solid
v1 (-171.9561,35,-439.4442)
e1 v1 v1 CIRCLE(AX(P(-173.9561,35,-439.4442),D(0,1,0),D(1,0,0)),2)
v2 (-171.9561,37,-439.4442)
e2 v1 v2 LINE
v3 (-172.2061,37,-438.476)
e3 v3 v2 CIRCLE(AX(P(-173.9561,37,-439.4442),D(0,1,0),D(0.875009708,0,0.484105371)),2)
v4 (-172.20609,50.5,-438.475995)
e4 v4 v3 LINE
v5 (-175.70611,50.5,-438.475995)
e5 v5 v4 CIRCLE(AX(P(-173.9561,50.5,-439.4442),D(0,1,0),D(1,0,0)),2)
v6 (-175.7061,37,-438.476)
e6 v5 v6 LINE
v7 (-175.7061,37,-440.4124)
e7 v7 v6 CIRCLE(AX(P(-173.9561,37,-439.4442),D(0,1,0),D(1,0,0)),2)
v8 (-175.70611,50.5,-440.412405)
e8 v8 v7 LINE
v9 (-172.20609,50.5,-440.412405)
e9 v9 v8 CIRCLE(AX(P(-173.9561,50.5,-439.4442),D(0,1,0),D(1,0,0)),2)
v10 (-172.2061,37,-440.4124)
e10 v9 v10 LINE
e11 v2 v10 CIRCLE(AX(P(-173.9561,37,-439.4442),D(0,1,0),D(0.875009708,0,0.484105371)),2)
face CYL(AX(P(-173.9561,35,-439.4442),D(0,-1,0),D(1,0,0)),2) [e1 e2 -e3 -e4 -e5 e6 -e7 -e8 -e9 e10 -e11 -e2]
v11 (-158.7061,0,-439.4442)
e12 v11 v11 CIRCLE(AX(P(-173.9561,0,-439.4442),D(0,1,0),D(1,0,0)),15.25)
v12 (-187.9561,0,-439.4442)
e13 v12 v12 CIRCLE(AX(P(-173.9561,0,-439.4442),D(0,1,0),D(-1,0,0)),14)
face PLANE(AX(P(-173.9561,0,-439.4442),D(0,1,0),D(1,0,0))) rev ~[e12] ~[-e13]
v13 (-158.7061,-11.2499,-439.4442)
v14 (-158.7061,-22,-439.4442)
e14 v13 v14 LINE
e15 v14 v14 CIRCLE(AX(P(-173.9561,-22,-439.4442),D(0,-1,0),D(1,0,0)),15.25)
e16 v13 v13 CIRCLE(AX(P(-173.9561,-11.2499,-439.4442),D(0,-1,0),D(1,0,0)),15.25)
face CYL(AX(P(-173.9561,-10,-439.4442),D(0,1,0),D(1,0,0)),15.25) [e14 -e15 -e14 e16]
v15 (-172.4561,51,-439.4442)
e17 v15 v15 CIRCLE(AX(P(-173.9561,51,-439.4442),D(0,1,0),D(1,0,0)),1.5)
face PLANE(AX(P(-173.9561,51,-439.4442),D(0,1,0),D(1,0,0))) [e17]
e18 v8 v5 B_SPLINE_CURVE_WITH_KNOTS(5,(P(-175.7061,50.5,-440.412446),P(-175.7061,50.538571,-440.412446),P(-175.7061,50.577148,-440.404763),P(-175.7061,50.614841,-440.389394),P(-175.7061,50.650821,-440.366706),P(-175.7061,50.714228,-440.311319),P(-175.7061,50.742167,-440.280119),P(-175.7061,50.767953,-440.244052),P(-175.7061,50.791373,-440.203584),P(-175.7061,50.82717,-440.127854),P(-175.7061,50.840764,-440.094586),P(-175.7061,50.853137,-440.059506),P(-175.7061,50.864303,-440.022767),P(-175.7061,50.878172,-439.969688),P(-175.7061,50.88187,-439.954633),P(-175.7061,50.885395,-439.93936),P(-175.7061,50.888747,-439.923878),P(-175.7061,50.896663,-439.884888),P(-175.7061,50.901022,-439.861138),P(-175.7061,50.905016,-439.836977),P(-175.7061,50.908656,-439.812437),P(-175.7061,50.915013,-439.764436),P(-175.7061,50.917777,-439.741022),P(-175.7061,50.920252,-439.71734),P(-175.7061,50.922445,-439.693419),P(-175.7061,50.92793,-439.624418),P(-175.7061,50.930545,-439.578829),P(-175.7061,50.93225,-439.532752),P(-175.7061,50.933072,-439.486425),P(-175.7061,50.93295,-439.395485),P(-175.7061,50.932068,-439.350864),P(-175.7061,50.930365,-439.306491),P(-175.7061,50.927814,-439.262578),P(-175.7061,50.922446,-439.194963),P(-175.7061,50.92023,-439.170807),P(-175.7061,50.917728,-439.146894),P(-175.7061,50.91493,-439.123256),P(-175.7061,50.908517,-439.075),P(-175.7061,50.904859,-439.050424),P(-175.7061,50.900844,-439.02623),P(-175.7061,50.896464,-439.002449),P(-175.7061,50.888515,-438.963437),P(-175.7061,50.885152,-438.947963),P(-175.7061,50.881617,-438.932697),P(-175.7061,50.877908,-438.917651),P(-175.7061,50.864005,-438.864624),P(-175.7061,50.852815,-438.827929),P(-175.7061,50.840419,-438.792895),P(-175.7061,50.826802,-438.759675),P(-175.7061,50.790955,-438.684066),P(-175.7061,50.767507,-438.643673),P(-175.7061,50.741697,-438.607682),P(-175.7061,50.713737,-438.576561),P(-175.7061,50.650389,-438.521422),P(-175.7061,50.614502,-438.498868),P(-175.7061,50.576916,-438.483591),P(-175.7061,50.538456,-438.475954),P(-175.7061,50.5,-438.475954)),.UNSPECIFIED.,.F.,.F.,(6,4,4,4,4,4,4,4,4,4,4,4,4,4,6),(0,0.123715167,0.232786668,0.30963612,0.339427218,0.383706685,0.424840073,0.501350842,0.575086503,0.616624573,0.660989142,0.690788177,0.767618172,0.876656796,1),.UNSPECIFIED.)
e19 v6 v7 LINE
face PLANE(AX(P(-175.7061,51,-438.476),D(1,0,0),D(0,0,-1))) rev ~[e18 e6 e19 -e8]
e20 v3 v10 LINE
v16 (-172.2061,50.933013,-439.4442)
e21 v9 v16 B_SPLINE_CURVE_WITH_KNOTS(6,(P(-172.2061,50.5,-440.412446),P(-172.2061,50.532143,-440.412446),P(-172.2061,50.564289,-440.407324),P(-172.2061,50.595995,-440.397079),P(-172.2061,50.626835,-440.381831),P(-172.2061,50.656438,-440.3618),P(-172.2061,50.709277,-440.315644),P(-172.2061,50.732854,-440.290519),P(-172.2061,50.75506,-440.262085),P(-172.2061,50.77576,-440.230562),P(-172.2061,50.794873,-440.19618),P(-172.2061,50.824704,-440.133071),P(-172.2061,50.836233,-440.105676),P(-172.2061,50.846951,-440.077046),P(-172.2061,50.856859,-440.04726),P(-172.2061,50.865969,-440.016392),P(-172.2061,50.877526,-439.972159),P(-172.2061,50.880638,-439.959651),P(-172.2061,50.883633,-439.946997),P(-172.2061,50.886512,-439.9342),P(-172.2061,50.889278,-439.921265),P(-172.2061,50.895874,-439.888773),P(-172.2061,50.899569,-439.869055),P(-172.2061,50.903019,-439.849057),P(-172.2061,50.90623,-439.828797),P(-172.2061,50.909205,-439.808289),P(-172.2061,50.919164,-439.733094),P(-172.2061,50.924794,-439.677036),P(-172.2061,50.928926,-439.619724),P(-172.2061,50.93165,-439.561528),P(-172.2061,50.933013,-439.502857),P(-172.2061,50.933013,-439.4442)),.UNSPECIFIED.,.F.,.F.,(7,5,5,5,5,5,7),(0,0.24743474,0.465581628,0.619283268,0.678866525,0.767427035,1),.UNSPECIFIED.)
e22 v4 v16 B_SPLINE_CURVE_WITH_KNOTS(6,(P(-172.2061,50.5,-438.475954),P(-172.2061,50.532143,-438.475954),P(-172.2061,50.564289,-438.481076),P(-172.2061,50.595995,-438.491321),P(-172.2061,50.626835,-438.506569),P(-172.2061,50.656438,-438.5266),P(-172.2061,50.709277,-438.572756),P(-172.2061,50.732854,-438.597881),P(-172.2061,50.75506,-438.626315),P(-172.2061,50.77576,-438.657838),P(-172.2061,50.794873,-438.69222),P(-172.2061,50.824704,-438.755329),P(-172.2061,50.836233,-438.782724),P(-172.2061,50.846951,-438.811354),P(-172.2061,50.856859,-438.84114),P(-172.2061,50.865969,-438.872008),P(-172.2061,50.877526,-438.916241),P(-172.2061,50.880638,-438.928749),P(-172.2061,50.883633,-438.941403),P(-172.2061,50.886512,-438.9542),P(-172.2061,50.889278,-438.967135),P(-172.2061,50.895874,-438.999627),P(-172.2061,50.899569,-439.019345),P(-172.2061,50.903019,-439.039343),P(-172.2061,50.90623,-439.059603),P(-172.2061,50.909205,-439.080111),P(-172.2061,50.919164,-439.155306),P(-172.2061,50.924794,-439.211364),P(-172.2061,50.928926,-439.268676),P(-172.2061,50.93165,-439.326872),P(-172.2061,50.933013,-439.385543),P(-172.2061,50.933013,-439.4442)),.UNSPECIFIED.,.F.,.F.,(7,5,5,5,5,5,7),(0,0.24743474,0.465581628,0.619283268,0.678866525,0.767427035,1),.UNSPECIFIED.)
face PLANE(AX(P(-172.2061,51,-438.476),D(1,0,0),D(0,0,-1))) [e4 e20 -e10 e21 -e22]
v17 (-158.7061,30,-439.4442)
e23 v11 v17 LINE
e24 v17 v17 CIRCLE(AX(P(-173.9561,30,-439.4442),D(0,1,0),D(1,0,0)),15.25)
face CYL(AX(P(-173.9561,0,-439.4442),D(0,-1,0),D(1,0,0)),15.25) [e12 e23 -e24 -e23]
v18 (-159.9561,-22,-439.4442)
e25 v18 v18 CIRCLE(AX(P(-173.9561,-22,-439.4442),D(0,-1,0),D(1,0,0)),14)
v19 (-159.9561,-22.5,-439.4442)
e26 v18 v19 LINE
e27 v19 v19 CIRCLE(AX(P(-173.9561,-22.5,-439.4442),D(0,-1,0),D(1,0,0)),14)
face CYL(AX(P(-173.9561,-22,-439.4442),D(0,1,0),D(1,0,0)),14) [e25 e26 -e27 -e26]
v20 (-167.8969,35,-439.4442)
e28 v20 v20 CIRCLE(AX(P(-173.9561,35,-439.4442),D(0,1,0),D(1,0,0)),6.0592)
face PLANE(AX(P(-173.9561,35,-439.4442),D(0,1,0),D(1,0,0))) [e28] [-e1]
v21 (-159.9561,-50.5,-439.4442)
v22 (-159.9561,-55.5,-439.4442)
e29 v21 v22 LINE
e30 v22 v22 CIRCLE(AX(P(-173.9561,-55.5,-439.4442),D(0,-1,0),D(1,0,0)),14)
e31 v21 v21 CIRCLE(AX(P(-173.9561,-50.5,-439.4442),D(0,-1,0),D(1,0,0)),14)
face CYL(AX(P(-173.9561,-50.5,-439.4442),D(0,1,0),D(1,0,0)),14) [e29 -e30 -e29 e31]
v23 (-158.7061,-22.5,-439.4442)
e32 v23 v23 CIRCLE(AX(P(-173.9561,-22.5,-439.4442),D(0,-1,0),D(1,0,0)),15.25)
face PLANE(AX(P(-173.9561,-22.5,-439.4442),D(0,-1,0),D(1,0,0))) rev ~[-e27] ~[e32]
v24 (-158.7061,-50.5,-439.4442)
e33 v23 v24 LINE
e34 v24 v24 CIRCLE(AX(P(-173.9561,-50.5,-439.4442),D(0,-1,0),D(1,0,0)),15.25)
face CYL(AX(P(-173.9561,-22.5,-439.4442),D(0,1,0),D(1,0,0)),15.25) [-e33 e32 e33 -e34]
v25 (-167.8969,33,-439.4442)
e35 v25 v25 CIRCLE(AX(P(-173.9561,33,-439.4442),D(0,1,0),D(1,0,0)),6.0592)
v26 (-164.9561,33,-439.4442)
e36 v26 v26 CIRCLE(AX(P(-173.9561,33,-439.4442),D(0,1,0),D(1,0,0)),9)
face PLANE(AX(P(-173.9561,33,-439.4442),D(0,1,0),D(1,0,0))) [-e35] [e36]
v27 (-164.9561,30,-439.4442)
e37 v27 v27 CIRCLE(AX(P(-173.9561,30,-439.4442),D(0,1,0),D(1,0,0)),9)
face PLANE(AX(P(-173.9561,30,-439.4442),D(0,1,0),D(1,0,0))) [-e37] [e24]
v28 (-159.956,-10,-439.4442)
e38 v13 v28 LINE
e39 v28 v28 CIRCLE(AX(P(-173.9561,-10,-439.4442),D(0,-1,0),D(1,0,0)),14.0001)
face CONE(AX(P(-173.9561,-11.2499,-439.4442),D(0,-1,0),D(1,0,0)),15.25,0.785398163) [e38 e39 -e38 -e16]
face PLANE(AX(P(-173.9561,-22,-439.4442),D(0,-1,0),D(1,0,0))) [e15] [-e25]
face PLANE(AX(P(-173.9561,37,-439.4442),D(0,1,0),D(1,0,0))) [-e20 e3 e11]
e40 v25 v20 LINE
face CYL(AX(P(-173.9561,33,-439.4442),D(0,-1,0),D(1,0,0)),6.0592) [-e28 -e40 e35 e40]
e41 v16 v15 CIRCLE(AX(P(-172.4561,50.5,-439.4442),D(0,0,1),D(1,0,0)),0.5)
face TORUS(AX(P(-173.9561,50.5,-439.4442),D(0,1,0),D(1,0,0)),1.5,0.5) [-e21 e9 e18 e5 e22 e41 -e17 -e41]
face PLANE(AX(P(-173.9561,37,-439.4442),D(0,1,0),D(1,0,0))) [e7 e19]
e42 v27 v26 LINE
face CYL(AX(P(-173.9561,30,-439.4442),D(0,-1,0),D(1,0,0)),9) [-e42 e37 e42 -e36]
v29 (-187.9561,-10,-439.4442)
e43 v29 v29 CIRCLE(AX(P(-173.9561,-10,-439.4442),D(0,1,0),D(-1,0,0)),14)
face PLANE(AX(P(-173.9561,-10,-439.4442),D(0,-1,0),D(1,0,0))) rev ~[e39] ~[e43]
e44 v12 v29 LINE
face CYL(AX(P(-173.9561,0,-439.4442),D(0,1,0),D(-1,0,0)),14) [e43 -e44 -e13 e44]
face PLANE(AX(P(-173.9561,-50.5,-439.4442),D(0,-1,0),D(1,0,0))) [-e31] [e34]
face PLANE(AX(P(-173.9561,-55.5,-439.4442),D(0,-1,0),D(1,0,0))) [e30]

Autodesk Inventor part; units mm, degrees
ref_plane "YZ Plane" through (0, 0, 0) normal (1, 0, 0) x (0, 1, 0)
sketch "Sketch1" plane through (0, 0, 0) normal (0, 1, 0) x (-1, 0, 0)
  circle A0 centre (173.9561, -439.4442) radius 14
  dimension "d17" = 28
extrude "Extrusion1" add sketch "Sketch1" against normal blind 10
sketch "Sketch2" plane through (-173.9561, -10, -439.4442) normal (0, -1, 0) x (1, 0, 0)
  circle A0 centre (0, 0) radius 15.25
  point P0 (173.9561, 439.4442)
  dimension "d20" = 30.5
extrude "Extrusion2" add sketch "Sketch2" along normal blind 12
chamfer "Chamfer1" distance 1.25 angle 45 1 edges at (-189.2061, -10, -439.4442)
sketch "Sketch4" plane through (-173.9561, -22, -439.4442) normal (0, -1, 0) x (1, 0, 0)
  circle A0 centre (0, 0) radius 14
  point P0 (173.9561, 439.4442)
  dimension "d26" = 28
extrude "Extrusion3" add sketch "Sketch4" along normal blind 0.5
sketch "Sketch5" plane through (-173.9561, -22.5, -439.4442) normal (0, -1, 0) x (1, 0, 0)
  circle A0 centre (0, 0) radius 15.25
  point P0 (173.9561, 439.4442)
  dimension "d29" = 30.5
extrude "Extrusion4" add sketch "Sketch5" along normal blind 28
sketch "Sketch6" plane through (-173.9561, -50.5, -439.4442) normal (0, -1, 0) x (1, 0, 0)
  circle A0 centre (0, 0) radius 14
  point P0 (173.9561, 439.4442)
  dimension "d32" = 28
extrude "Extrusion5" add sketch "Sketch6" along normal blind 5
sketch "Sketch7" plane through (-173.9561, 0, -439.4442) normal (0, 1, 0) x (1, 0, 0)
  circle A0 centre (0, 0) radius 15.25
  point P0 (173.9561, -439.4442)
  dimension "d35" = 30.5
extrude "Extrusion6" add sketch "Sketch7" along normal blind 30
sketch "Sketch8" plane through (-173.9561, 30, -439.4442) normal (0, 1, 0) x (1, 0, 0)
  circle A0 centre (0, 0) radius 9
  point P0 (173.9561, -439.4442)
  dimension "d38" = 18
extrude "Extrusion7" add sketch "Sketch8" along normal blind 3
sketch "Sketch10" plane through (-173.9561, 33, -439.4442) normal (0, 1, 0) x (1, 0, 0)
  circle A0 centre (0, 0) radius 6.0592
  point P0 (173.9561, -439.4442)
extrude "Extrusion9" add sketch "Sketch10" along normal blind 2
sketch "Sketch11" plane through (-173.9561, 35, -439.4442) normal (0, 1, 0) x (1, 0, 0)
  circle A0 centre (0, 0) radius 2
  point P0 (173.9561, -439.4442)
  dimension "d45" = 4
extrude "Extrusion10" add sketch "Sketch11" along normal blind 16
fillet "Fillet1" radius 0.5 1 edges at (-175.9561, 51, -439.4442)
sketch "Sketch12" plane through (-173.9561, 51, -439.4442) normal (0, 1, 0) x (1, 0, 0)
  circle A0 centre (0, 0) radius 2 projected
  circle A1 centre (0, 0) radius 2 projected
  line L0 (-1.75, -0.9682) -> (-1.75, 0.9682)
  line L1 (1.75, -0.9682) -> (1.75, 0.9682)
  point P0 (173.9561, -439.4442)
  dimension "d49" = 3.5
  dimension "d50" = 1.75
extrude "Extrusion11" cut sketch "Sketch12" against normal blind 14 contours A0 L1 | L0 A0
ref_plane "Work Plane1" through (-173.9561, 20, -439.4442) normal (0, 1, 0) x (1, 0, 0)
ref_plane "Work Plane2" through (-173.9561, 5, -439.4442) normal (0, -1, 0) x (1, 0, 0)
split_face "Split1"
split_face "Split2"
equation "\"d50\" = 0.5 * d49"
properties part number "14-0009"
